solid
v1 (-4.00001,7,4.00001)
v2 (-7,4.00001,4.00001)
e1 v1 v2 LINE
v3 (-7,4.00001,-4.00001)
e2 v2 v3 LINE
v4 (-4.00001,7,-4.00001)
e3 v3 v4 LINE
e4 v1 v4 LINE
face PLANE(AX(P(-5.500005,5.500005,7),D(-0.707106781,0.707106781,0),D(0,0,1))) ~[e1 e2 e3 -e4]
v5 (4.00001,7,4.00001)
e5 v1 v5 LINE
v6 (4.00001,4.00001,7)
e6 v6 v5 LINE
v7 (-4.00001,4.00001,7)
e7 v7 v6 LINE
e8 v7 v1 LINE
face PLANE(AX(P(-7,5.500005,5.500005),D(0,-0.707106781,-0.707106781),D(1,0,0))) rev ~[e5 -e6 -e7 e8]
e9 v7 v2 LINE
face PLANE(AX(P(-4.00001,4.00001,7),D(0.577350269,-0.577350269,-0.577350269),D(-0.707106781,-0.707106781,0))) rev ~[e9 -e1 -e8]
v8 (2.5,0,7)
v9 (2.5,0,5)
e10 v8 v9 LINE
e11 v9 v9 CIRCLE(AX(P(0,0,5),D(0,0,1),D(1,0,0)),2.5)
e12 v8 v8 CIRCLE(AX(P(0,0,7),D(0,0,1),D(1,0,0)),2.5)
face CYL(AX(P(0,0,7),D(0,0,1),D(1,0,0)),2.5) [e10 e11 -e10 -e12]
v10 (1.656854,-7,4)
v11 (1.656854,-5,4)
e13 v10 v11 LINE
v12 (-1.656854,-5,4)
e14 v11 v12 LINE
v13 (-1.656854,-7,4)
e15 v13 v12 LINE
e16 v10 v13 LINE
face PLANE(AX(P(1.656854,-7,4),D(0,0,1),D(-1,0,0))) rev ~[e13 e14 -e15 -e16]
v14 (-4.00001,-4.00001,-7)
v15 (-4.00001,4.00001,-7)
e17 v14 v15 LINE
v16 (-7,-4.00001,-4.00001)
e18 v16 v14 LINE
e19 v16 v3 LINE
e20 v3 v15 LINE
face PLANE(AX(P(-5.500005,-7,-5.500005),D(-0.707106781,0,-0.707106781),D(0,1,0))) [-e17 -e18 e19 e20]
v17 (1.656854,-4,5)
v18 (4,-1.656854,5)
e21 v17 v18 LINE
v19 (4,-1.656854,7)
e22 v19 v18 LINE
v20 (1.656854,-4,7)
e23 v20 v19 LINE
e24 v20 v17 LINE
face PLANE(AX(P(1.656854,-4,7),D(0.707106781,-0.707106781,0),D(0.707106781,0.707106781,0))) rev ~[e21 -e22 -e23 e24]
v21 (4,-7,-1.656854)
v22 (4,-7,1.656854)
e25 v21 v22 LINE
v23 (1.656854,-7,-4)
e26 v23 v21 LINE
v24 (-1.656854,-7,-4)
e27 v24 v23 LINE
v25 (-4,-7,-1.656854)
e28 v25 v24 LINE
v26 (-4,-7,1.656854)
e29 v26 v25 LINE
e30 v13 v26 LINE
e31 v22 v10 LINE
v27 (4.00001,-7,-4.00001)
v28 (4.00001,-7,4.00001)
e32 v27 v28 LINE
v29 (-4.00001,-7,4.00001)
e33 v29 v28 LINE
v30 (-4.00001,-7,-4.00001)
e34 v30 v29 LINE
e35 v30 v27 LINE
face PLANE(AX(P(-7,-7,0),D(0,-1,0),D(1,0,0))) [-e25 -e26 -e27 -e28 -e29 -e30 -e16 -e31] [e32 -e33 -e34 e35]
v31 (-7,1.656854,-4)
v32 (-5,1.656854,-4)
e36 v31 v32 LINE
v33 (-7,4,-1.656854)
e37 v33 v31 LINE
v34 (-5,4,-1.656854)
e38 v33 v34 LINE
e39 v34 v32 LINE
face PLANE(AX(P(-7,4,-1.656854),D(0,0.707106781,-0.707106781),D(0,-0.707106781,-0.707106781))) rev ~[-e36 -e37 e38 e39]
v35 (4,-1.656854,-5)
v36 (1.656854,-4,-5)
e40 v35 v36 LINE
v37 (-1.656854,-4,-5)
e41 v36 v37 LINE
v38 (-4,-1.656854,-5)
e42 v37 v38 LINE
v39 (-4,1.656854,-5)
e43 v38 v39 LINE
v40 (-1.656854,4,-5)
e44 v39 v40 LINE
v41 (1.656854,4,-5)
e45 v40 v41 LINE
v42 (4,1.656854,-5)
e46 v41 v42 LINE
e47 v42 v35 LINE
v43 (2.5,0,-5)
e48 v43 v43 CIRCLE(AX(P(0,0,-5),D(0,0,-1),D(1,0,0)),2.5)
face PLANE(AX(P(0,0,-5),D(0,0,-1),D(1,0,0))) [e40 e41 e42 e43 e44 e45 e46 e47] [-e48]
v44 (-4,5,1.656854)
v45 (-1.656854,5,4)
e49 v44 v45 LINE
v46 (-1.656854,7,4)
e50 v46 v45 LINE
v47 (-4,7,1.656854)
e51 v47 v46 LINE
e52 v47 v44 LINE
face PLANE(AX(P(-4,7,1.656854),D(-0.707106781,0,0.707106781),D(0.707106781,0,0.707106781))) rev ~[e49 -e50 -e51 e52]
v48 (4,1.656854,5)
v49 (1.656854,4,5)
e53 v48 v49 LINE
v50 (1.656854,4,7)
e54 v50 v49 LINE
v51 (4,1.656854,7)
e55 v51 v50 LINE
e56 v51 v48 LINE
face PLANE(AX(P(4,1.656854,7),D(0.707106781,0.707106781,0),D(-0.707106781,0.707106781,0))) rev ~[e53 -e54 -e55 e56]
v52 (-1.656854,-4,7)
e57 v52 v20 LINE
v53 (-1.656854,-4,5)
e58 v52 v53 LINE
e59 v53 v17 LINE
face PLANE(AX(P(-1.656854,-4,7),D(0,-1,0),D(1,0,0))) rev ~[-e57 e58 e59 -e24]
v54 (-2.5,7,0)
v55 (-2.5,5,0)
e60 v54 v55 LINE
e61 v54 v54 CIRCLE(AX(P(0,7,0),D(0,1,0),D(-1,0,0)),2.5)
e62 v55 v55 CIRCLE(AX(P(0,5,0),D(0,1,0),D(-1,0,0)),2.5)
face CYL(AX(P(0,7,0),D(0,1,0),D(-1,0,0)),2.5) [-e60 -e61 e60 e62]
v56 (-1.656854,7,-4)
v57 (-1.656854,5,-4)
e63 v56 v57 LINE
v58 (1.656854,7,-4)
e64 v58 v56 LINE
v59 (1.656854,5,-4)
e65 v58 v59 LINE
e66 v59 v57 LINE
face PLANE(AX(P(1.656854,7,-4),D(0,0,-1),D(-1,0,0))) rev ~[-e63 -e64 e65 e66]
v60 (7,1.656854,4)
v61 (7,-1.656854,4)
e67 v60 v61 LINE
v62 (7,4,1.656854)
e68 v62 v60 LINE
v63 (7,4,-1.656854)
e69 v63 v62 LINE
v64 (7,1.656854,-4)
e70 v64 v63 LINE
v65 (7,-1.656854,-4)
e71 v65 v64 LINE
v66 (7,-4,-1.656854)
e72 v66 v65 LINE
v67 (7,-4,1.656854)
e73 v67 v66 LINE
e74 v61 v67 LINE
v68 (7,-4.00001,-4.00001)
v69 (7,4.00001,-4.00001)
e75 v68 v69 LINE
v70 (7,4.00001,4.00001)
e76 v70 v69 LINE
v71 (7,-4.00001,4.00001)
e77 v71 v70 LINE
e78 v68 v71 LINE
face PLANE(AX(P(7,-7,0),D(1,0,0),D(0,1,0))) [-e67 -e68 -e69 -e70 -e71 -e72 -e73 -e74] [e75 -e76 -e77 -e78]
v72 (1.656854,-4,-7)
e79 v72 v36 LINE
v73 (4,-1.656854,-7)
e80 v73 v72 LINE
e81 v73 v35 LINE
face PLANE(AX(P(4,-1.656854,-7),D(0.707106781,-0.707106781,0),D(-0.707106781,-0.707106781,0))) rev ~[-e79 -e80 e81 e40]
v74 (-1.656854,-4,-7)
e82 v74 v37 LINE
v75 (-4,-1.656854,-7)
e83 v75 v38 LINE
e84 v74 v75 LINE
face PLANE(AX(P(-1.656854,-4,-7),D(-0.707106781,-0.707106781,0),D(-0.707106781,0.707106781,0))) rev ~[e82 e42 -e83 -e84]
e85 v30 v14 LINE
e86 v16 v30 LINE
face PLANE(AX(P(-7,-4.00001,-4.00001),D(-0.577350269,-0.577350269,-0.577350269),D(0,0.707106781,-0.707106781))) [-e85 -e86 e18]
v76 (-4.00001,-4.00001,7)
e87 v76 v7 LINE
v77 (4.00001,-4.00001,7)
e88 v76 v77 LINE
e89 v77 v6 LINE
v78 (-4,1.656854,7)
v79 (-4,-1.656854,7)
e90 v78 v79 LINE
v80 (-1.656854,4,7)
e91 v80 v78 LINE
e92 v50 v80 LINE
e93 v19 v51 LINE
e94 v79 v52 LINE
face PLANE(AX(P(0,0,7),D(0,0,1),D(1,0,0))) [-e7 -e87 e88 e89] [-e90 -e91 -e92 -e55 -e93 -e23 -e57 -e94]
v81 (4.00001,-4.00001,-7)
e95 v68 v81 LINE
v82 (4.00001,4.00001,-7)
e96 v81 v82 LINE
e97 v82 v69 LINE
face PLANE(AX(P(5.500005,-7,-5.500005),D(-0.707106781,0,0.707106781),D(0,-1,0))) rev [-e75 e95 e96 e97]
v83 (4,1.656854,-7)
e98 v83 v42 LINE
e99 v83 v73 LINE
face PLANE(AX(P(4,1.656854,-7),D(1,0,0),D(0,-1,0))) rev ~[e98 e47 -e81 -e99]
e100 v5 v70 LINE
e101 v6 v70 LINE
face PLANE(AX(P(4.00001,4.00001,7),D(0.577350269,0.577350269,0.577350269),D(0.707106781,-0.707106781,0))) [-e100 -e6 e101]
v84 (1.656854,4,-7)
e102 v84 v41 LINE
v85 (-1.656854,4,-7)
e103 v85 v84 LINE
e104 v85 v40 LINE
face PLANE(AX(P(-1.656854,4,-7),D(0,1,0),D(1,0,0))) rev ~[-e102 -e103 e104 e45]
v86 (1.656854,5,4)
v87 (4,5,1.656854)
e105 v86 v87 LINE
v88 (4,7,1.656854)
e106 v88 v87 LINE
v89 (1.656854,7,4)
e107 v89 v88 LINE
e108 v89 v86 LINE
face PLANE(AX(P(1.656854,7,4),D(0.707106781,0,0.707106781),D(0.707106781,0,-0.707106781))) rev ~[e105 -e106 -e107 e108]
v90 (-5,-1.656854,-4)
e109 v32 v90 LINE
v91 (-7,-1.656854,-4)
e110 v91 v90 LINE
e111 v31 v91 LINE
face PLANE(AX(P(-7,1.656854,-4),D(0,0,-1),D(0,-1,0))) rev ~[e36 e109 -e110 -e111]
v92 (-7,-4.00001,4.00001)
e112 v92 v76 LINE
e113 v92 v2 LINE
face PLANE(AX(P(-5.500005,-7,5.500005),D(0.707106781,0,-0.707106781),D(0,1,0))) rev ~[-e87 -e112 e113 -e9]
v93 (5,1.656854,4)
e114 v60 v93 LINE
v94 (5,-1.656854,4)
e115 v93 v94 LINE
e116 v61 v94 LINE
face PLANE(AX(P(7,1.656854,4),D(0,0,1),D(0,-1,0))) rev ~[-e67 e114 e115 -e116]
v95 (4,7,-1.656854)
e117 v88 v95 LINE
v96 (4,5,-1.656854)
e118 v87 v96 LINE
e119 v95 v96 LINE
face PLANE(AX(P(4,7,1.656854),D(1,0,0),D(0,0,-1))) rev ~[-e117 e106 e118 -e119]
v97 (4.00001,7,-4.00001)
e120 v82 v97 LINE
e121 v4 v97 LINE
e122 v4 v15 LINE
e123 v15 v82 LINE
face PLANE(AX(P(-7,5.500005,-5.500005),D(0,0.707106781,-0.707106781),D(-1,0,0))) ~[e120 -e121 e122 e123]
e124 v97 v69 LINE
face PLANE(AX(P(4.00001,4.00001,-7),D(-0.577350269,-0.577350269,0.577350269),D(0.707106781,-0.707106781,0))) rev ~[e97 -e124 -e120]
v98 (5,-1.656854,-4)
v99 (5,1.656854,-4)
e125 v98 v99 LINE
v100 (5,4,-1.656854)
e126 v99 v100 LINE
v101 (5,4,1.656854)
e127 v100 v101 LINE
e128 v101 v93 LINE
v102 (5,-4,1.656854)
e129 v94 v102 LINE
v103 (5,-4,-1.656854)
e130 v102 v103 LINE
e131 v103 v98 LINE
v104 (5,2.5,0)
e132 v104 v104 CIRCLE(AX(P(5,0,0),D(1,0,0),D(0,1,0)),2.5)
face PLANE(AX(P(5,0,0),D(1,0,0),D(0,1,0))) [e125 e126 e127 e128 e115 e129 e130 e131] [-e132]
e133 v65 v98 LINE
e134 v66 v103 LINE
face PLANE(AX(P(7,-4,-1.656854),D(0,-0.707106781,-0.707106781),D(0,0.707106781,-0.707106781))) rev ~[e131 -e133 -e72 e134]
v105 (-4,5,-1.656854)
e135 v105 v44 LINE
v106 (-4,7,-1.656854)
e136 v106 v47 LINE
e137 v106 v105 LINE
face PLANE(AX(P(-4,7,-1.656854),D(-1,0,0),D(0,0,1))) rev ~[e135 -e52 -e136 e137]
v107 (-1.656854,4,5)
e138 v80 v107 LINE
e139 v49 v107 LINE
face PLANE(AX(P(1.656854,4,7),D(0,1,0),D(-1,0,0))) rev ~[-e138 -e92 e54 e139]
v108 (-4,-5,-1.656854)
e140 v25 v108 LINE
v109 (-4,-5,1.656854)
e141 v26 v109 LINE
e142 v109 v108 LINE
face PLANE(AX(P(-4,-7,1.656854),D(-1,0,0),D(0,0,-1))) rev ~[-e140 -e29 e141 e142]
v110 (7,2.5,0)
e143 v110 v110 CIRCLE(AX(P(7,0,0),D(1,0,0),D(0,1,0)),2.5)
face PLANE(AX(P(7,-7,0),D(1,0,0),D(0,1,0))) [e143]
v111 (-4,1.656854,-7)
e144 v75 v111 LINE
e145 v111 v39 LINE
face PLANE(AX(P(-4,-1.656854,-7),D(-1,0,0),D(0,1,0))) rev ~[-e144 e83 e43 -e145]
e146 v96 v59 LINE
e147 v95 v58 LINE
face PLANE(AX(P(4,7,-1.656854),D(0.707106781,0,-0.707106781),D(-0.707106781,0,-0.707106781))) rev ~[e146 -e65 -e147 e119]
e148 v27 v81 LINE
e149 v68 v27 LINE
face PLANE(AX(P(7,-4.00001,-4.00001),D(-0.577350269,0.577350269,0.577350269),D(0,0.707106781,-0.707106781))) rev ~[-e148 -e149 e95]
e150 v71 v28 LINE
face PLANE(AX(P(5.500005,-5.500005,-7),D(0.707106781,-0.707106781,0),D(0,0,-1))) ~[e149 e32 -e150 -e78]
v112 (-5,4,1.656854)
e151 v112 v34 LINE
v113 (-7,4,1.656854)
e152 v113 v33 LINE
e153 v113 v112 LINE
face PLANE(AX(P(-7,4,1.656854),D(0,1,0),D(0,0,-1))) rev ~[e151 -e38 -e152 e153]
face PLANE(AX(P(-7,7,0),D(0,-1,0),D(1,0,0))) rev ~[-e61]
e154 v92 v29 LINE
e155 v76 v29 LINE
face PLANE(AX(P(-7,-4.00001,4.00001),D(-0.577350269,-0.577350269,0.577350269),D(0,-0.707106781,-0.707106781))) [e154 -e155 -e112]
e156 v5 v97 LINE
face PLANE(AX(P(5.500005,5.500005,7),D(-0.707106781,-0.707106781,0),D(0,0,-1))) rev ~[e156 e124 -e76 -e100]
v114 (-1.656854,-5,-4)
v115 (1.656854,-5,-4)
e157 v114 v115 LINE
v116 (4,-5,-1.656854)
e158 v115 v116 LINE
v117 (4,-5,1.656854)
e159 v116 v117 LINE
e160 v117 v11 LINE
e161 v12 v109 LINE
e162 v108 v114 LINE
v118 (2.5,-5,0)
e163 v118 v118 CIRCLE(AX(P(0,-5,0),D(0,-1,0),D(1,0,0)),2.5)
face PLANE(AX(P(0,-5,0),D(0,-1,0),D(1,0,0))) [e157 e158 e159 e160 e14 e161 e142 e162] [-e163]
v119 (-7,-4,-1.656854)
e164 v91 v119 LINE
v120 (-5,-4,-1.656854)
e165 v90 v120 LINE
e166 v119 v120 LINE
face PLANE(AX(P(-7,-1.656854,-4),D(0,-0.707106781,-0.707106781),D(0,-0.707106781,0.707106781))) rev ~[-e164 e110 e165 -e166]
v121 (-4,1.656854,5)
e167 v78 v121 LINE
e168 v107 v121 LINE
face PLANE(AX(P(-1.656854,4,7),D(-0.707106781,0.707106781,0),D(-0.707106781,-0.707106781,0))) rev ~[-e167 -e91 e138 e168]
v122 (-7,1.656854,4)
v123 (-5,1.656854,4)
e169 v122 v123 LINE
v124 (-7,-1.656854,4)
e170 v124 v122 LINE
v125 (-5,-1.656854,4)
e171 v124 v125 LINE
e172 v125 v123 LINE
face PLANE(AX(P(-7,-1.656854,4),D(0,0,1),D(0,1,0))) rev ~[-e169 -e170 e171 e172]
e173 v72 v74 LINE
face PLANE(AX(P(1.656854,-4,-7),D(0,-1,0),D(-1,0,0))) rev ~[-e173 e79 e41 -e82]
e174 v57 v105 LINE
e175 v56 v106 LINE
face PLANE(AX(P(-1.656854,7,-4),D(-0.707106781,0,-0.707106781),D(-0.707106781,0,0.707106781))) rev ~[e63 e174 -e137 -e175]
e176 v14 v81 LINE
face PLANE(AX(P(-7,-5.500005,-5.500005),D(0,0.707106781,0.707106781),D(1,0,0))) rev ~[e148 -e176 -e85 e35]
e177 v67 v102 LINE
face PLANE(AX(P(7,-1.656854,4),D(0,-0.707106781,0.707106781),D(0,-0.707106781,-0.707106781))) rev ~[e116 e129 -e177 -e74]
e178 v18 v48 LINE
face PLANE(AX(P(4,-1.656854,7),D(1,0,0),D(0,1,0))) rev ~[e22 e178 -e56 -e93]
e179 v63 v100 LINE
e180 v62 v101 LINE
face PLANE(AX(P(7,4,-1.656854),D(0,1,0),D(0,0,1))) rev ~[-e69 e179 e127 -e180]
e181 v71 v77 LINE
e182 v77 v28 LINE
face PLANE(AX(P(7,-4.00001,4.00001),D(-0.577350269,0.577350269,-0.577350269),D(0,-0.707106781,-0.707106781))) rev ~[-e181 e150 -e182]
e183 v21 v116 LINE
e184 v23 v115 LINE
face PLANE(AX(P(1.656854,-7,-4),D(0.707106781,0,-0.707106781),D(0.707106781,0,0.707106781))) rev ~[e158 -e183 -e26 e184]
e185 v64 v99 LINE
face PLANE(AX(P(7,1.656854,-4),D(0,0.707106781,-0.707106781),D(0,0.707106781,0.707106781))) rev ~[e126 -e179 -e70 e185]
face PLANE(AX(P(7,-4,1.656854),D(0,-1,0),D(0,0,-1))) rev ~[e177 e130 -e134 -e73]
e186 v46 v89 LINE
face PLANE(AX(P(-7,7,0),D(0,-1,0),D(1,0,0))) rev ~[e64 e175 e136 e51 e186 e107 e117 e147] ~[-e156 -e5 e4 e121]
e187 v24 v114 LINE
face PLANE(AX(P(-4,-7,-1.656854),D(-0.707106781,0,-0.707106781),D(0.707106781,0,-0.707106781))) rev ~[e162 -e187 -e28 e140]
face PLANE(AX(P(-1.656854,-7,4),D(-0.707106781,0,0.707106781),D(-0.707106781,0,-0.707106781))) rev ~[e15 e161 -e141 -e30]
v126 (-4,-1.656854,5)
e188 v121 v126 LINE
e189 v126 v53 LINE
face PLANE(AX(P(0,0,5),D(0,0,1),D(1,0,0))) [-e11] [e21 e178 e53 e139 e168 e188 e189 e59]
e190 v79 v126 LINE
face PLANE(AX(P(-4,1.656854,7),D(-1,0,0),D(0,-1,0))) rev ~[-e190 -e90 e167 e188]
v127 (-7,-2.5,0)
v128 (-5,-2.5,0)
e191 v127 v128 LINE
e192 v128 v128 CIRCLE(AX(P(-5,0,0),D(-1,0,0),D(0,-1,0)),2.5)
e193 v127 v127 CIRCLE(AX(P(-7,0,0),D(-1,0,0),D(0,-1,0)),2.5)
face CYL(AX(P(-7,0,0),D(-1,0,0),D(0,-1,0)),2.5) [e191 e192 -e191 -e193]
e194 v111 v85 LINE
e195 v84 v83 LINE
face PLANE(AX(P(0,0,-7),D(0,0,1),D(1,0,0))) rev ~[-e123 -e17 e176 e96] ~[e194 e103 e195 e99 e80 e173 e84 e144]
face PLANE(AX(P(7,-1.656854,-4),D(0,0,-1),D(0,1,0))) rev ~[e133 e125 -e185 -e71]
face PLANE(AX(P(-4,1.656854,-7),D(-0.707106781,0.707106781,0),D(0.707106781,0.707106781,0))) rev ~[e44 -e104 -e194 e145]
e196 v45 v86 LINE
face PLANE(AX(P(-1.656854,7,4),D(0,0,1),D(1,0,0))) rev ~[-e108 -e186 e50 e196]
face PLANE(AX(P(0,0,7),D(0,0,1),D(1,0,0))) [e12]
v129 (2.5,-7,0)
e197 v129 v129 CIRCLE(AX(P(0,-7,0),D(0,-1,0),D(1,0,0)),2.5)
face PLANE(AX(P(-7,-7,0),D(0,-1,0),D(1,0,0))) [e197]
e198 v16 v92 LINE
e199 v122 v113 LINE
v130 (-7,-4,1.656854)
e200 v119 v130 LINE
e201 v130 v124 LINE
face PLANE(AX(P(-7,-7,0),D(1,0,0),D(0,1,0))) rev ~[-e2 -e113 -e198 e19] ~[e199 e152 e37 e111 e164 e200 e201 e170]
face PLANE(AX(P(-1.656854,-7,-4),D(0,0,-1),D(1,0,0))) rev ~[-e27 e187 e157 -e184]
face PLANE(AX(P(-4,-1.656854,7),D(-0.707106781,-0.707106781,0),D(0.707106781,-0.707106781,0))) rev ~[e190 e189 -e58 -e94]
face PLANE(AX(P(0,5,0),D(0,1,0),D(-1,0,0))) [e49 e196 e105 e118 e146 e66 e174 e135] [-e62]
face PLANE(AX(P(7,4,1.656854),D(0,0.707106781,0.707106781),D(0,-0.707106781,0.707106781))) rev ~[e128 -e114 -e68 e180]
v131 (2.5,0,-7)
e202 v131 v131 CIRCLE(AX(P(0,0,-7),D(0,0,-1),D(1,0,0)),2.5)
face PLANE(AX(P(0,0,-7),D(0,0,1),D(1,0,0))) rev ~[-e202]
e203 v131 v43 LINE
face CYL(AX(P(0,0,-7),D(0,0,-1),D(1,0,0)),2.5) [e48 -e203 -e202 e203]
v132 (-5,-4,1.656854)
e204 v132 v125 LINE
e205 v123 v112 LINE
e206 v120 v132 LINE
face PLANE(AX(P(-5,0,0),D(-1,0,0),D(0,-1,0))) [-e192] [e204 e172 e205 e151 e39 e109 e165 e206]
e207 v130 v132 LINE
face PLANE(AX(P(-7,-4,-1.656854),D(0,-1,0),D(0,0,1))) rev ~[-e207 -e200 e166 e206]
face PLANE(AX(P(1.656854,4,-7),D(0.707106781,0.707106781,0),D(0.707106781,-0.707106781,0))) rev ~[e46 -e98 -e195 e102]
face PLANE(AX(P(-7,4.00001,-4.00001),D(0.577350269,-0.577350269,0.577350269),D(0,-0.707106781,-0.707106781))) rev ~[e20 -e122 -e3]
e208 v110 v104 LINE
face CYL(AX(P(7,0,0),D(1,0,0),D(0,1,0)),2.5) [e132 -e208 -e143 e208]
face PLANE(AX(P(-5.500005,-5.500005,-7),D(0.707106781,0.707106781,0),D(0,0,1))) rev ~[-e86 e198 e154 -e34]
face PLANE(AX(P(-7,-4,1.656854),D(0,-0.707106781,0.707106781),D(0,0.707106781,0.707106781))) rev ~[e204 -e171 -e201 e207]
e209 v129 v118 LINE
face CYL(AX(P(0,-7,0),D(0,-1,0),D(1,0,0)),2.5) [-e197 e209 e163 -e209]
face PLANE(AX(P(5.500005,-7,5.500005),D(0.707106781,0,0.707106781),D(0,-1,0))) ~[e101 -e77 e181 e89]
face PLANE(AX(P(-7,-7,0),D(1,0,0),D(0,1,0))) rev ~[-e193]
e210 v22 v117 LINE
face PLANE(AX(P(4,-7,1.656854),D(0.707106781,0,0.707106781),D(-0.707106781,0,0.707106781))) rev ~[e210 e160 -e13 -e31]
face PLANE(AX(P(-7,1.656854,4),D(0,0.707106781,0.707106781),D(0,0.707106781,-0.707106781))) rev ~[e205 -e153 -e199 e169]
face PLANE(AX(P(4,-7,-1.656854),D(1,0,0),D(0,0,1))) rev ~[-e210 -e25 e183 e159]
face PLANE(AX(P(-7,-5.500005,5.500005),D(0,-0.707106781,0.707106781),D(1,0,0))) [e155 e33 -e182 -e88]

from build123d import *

# Parameters (mm, degrees)
F0_W      = 14
F0_H      = 14
F1_DEPTH  = 7
F2_R      = 2.5
F4_DEPTH  = 2
F5_SIZE   = 2.99999
F6_R      = 2.5
F11_DEPTH = 2
F7_R      = 2.5
F12_DEPTH = 2
F8_R      = 2.5
F13_DEPTH = 2
F9_R      = 2.5
F14_DEPTH = 2
F10_R     = 2.5
F15_DEPTH = 2


# Not quite as in the source:
# - a fillet or chamfer is up to 0.001 mm smaller than in the source, because OpenCascade refuses the exact size


with BuildPart() as f1:
    # F0 (on Top) → F1 (new body, symmetric)
    with BuildSketch(Plane.XY):
        Rectangle(F0_W, F0_H)
    extrude(amount=F1_DEPTH, both=True)

    # F2 (on face) → F4 (cut)
    with BuildSketch(Plane.YZ.offset(7)):
        Polygon((-4, 1.6568542495), (-4, -1.6568542495), (-1.6568542495, -4), (1.6568542495, -4), (4, -1.6568542495), (4, 1.6568542495), (1.6568542495, 4), (-1.6568542495, 4), align=None)
        Circle(F2_R, mode=Mode.SUBTRACT)
    extrude(amount=-F4_DEPTH, mode=Mode.SUBTRACT)

    # F5 (size 3 in the source; OpenCascade refuses exactly that, so slightly less here)
    f5_edges = [f1.edges().sort_by_distance(p)[0] for p in [
        (7, 7, 0),
        (0, 7, -7),
        (-7, 7, 0),
        (0, 7, 7),
        (0, -7, 7),
        (7, 0, 7),
        (-7, 0, 7),
        (0, -7, -7),
        (7, -7, 0),
        (-7, -7, 0),
        (7, 0, -7),
        (-7, 0, -7),
    ]]
    chamfer(f5_edges, length=F5_SIZE)

    # F6 (on face) → F11 (cut)
    with BuildSketch(Plane(origin=(0, 7, 0), x_dir=(-1, 0, 0), z_dir=(0, 1, 0))):
        Polygon((-4, 1.6568542495), (-4, -1.6568542495), (-1.6568542495, -4), (1.6568542495, -4), (4, -1.6568542495), (4, 1.6568542495), (1.6568542495, 4), (-1.6568542495, 4), align=None)
        Circle(F6_R, mode=Mode.SUBTRACT)
    extrude(amount=-F11_DEPTH, mode=Mode.SUBTRACT)

    # F7 (on face) → F12 (cut)
    with BuildSketch(Plane.XY.offset(7)):
        Polygon((-4, 1.6568542495), (-4, -1.6568542495), (-1.6568542495, -4), (1.6568542495, -4), (4, -1.6568542495), (4, 1.6568542495), (1.6568542495, 4), (-1.6568542495, 4), align=None)
        Circle(F7_R, mode=Mode.SUBTRACT)
    extrude(amount=-F12_DEPTH, mode=Mode.SUBTRACT)

    # F8 (on face) → F13 (cut)
    with BuildSketch(Plane(origin=(-7, 0, 0), x_dir=(0, -1, 0), z_dir=(-1, 0, 0))):
        Polygon((-4, 1.6568542495), (-4, -1.6568542495), (-1.6568542495, -4), (1.6568542495, -4), (4, -1.6568542495), (4, 1.6568542495), (1.6568542495, 4), (-1.6568542495, 4), align=None)
        Circle(F8_R, mode=Mode.SUBTRACT)
    extrude(amount=-F13_DEPTH, mode=Mode.SUBTRACT)

    # F9 (on face) → F14 (cut)
    with BuildSketch(Plane.XZ.offset(7)):
        Polygon((-4, 1.6568542495), (-4, -1.6568542495), (-1.6568542495, -4), (1.6568542495, -4), (4, -1.6568542495), (4, 1.6568542495), (1.6568542495, 4), (-1.6568542495, 4), align=None)
        Circle(F9_R, mode=Mode.SUBTRACT)
    extrude(amount=-F14_DEPTH, mode=Mode.SUBTRACT)

    # F10 (on face) → F15 (cut)
    with BuildSketch(Plane(origin=(0, 0, -7), x_dir=(1, 0, 0), z_dir=(0, 0, -1))):
        Polygon((-4, 1.6568542495), (-4, -1.6568542495), (-1.6568542495, -4), (1.6568542495, -4), (4, -1.6568542495), (4, 1.6568542495), (1.6568542495, 4), (-1.6568542495, 4), align=None)
        Circle(F10_R, mode=Mode.SUBTRACT)
    extrude(amount=-F15_DEPTH, mode=Mode.SUBTRACT)


solid = f1.part
